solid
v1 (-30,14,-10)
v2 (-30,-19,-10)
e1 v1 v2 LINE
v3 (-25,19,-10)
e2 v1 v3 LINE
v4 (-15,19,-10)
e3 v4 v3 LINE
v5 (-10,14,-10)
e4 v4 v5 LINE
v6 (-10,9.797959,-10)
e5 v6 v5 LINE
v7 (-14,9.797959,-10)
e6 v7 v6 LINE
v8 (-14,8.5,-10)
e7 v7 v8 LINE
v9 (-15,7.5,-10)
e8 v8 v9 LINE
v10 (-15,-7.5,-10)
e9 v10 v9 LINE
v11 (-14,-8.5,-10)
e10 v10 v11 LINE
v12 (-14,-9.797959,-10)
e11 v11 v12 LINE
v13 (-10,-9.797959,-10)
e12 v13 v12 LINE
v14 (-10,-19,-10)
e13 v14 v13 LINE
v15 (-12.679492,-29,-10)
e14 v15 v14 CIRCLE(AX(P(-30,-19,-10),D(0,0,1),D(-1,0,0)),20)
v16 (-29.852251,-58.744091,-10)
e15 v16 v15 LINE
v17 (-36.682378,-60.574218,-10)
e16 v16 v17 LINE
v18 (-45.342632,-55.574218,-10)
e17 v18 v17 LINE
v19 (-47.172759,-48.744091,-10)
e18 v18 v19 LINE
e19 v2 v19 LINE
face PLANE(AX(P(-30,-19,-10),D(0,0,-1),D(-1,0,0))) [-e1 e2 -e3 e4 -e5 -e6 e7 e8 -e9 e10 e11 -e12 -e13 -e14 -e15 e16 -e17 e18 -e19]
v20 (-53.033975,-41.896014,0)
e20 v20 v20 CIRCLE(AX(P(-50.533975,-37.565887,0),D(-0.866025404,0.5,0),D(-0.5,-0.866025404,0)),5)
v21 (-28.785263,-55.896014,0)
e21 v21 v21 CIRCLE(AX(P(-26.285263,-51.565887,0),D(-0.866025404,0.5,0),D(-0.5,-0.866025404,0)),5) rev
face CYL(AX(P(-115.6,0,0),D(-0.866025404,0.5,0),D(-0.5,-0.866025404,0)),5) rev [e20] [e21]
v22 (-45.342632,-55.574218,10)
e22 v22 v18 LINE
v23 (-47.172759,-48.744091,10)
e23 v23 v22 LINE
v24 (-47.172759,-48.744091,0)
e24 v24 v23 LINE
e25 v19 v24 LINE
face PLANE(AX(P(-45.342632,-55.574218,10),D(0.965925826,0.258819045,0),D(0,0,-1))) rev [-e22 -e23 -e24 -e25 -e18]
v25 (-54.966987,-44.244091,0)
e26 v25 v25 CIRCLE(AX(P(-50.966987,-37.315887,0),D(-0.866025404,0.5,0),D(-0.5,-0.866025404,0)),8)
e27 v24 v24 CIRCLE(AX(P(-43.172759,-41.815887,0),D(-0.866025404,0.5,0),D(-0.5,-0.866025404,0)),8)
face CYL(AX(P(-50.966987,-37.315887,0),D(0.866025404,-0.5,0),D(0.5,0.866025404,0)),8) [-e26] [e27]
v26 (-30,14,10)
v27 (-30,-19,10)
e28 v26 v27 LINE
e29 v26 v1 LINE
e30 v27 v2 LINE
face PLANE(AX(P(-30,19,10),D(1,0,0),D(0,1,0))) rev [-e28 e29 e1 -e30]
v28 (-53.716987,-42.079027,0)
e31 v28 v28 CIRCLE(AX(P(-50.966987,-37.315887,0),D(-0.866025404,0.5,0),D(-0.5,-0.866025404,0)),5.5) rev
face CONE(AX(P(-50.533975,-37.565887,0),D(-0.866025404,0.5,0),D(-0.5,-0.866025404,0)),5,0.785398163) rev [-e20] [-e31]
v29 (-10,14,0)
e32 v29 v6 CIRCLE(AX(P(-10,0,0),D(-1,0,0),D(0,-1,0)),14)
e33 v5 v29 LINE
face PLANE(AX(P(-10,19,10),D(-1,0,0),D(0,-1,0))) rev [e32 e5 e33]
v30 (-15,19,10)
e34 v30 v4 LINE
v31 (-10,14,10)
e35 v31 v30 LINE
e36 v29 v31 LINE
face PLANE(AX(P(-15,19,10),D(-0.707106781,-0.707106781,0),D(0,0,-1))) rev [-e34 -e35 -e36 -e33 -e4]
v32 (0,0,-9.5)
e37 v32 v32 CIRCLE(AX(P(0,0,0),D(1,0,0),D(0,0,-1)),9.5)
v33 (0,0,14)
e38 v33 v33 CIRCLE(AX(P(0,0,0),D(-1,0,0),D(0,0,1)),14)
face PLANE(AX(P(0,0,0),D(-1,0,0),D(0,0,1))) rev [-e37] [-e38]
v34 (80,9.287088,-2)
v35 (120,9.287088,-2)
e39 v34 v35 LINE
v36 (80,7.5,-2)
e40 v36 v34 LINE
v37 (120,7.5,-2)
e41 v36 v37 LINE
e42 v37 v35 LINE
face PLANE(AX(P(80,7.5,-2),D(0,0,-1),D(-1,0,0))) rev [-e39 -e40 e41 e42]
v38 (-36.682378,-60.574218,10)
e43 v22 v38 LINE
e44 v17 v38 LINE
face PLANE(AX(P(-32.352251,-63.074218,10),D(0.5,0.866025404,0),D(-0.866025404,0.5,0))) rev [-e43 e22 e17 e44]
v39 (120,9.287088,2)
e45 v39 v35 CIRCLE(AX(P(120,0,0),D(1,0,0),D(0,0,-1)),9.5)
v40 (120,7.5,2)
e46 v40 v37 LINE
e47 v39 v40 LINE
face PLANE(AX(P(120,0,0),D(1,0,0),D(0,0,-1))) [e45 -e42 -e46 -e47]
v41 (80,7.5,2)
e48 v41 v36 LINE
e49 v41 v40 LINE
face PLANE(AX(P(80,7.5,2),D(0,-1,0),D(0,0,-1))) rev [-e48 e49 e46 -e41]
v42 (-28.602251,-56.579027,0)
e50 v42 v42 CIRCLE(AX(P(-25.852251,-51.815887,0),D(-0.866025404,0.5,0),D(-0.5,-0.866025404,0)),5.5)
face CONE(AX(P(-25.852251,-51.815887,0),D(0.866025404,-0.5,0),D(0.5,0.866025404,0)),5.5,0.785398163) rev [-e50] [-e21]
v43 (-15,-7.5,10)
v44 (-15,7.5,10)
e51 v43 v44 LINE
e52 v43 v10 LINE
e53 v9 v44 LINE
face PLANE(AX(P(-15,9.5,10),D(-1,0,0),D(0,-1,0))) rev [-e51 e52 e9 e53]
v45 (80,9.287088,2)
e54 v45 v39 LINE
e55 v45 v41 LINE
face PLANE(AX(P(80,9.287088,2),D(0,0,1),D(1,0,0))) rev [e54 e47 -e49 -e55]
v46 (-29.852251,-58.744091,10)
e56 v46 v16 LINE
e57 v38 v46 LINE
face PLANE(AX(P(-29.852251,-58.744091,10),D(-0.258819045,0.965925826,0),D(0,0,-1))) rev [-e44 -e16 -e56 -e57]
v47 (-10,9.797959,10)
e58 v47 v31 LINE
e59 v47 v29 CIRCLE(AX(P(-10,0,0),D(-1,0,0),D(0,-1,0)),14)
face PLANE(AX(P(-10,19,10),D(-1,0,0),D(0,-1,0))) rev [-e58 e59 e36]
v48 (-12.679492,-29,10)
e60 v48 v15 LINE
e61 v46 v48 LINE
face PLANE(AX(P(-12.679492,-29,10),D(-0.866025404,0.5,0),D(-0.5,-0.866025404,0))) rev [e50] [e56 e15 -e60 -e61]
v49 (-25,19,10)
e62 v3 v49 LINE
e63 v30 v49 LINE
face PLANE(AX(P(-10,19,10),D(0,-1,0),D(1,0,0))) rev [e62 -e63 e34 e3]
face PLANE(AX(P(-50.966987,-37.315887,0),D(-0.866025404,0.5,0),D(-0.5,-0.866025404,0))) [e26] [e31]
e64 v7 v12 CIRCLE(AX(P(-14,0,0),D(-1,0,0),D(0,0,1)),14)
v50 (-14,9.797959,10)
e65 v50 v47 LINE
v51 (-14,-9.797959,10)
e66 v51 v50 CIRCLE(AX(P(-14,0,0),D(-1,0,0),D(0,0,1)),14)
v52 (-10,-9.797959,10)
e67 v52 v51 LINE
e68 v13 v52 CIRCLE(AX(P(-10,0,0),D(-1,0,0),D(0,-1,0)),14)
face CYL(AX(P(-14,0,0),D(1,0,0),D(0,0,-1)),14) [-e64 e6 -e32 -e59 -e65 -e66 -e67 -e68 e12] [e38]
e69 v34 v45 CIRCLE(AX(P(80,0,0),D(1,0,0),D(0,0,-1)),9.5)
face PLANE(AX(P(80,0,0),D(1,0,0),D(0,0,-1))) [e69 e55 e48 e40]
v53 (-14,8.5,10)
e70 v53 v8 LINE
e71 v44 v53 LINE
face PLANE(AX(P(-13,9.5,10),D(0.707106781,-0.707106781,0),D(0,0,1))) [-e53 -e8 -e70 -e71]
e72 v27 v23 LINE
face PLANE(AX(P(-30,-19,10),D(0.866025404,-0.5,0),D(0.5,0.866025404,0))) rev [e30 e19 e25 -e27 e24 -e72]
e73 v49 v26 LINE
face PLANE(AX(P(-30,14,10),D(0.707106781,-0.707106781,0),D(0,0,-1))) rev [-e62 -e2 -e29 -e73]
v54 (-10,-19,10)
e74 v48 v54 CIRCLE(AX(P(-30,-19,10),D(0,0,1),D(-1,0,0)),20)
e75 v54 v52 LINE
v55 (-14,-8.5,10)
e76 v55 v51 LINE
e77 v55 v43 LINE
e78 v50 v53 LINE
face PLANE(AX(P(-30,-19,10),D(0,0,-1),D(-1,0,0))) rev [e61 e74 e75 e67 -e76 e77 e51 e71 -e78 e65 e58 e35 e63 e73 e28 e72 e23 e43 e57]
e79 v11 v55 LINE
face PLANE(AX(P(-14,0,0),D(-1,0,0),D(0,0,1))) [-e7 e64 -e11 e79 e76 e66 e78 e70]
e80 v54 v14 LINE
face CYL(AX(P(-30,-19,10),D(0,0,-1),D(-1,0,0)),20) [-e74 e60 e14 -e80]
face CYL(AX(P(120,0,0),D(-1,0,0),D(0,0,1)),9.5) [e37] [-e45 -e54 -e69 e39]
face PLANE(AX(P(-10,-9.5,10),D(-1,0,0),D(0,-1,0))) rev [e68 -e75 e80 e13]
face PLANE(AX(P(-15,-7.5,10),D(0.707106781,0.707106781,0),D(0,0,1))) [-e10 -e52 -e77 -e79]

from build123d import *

# Parameters (mm, degrees)
SCHIZZO1_R                   = 9.5
ESTRUSIONE_ESTRUSIONE1_DEPTH = 120
TAGLIO_ESTRUSIONE1_START     = -40
TAGLIO_ESTRUSIONE1_DEPTH     = 40
SCHIZZO3_R                   = 14
ESTRUSIONE_ESTRUSIONE2_DEPTH = 14
ESTRUSIONE_ESTRUSIONE3_DEPTH = 10
SMUSSO1_SIZE                 = 5
SMUSSO2_SIZE                 = 2
SMUSSO3_SIZE                 = 5
SMUSSO4_SIZE                 = 0.5
ESTRUSIONE_ESTRUSIONE4_START = 9
SCHIZZO7_R                   = 8
SCHIZZO7_R_2                 = 5
ESTRUSIONE_ESTRUSIONE4_DEPTH = 9
SMUSSO5_SIZE                 = 0.5


# Some blends are built 0.0001 mm under size
with BuildPart() as part:
    # Schizzo1 → Estrusione-Estrusione1 (new body)
    with BuildSketch(Plane(origin=(0, 0, 0), x_dir=(0, 0, -1), z_dir=(1, 0, 0))):
        Circle(SCHIZZO1_R)
    extrude(amount=ESTRUSIONE_ESTRUSIONE1_DEPTH)

    # Schizzo2 → Taglio-Estrusione1 (cut)
    with BuildSketch(Plane(origin=(120, 0, 0), x_dir=(0, 0, -1), z_dir=(1, 0, 0)).offset(TAGLIO_ESTRUSIONE1_START)):
        with BuildLine():
            Line((-2, 9.287087811), (-2, 7.5))
            Line((-2, 7.5), (2, 7.5))
            Line((2, 7.5), (2, 9.287087811))
            ThreePointArc((2, 9.287087811), (0, 9.5), (-2, 9.287087811))
        make_face()
    extrude(amount=TAGLIO_ESTRUSIONE1_DEPTH, mode=Mode.SUBTRACT)

    # Schizzo3 → Estrusione-Estrusione2 (add)
    with BuildSketch(Plane.ZY):
        Circle(SCHIZZO3_R)
    extrude(amount=ESTRUSIONE_ESTRUSIONE2_DEPTH)

    # Schizzo4 → Estrusione-Estrusione3 (add, symmetric)
    with BuildSketch(Plane.XY):
        with BuildLine():
            Line((-10, 19), (-10, 9.5))
            Line((-10, 9.5), (-15, 9.5))
            Line((-15, 9.5), (-15, -9.5))
            Line((-15, -9.5), (-10, -9.5))
            Line((-10, -9.5), (-10, -19))
            ThreePointArc((-10, -19), (-10.681483474, -24.176380902), (-12.679491924, -29))
            Line((-12.679491924, -29), (-32.352250588, -63.074217531))
            Line((-32.352250588, -63.074217531), (-49.672758664, -53.074217531))
            Line((-49.672758664, -53.074217531), (-30, -19))
            Line((-30, -19), (-30, 19))
            Line((-30, 19), (-10, 19))
        make_face()
    extrude(amount=ESTRUSIONE_ESTRUSIONE3_DEPTH, both=True)

    # Smusso1
    smusso1_edges = [part.edges().sort_by_distance(p)[0] for p in [
        (-10, 19, 0),
        (-30, 19, 0),
    ]]
    chamfer(smusso1_edges, length=SMUSSO1_SIZE - 0.0001)  # a hair under: the kernel refuses the full size

    # Smusso2
    # the kernel refuses this chamfer: 2 mm, written as the material it adds along each edge
    with BuildSketch(Plane(origin=(-15, 9.5, 10), x_dir=(0.9996219169112968, 0.027495876610586487, 0), z_dir=(0, 0, -1)), Plane(origin=(-15, -9.5, 10), x_dir=(-0.02749587661058651, 0.9996219169112968, 0), z_dir=(0, 0, -1))) as smusso2_piece_1:
        Polygon((SMUSSO2_SIZE * 0.999621916911, SMUSSO2_SIZE * 0.0274958766106), (-SMUSSO2_SIZE * 0.0274958766106, SMUSSO2_SIZE * 0.999621916911), (0, 0), align=None)
    extrude(amount=20)

    # Smusso3
    smusso3_edges = [part.edges().sort_by_distance(p)[0] for p in [
        (-49.672758664, -53.074217531, 0),
        (-32.352250588, -63.074217531, 0),
    ]]
    chamfer(smusso3_edges, length=SMUSSO3_SIZE)

    # Schizzo6 → Taglia-Rivoluzione1 (revolve, cut)
    with BuildSketch(Plane.XY, mode=Mode.PRIVATE) as taglia_rivoluzione1_sk:
        Polygon((-43.172758664, -41.815887282), (-25.852250588, -51.815887282), (-23.352250588, -47.485760263), (-40.672758664, -37.485760263), align=None)
    revolve(taglia_rivoluzione1_sk.sketch.rotate(Axis((-115.6, 0, 0), (0.8660254037844387, -0.5000000000000001, 0)), 180), axis=Axis((-115.6, 0, 0), (0.8660254037844387, -0.5000000000000001, 0)), mode=Mode.SUBTRACT)

    # Smusso4
    smusso4_edges = [part.edges().sort_by_distance(p)[0] for p in [
        (-23.352250588, -47.485760263, 0),
    ]]
    chamfer(smusso4_edges, length=SMUSSO4_SIZE)

    # Schizzo7 → Estrusione-Estrusione4 (add)
    with BuildSketch(Plane(origin=(-14.272758664, 8.240381057, 0), x_dir=(0, 0, 1), z_dir=(-0.8660254037844383, 0.5000000000000009, 0)).offset(ESTRUSIONE_ESTRUSIONE4_START)):
        with Locations(Location((0, -57.8, 0), (0, 0, 270))):
            Circle(SCHIZZO7_R)
        with Locations(Location((0, -57.8, 0), (0, 0, 270))):
            Circle(SCHIZZO7_R_2, mode=Mode.SUBTRACT)
    extrude(amount=-ESTRUSIONE_ESTRUSIONE4_DEPTH)

    # Smusso5
    smusso5_edges = [part.edges().sort_by_distance(p)[0] for p in [
        (-48.466987298, -32.985760263, 0),
    ]]
    chamfer(smusso5_edges, length=SMUSSO5_SIZE)


solid = part.part
